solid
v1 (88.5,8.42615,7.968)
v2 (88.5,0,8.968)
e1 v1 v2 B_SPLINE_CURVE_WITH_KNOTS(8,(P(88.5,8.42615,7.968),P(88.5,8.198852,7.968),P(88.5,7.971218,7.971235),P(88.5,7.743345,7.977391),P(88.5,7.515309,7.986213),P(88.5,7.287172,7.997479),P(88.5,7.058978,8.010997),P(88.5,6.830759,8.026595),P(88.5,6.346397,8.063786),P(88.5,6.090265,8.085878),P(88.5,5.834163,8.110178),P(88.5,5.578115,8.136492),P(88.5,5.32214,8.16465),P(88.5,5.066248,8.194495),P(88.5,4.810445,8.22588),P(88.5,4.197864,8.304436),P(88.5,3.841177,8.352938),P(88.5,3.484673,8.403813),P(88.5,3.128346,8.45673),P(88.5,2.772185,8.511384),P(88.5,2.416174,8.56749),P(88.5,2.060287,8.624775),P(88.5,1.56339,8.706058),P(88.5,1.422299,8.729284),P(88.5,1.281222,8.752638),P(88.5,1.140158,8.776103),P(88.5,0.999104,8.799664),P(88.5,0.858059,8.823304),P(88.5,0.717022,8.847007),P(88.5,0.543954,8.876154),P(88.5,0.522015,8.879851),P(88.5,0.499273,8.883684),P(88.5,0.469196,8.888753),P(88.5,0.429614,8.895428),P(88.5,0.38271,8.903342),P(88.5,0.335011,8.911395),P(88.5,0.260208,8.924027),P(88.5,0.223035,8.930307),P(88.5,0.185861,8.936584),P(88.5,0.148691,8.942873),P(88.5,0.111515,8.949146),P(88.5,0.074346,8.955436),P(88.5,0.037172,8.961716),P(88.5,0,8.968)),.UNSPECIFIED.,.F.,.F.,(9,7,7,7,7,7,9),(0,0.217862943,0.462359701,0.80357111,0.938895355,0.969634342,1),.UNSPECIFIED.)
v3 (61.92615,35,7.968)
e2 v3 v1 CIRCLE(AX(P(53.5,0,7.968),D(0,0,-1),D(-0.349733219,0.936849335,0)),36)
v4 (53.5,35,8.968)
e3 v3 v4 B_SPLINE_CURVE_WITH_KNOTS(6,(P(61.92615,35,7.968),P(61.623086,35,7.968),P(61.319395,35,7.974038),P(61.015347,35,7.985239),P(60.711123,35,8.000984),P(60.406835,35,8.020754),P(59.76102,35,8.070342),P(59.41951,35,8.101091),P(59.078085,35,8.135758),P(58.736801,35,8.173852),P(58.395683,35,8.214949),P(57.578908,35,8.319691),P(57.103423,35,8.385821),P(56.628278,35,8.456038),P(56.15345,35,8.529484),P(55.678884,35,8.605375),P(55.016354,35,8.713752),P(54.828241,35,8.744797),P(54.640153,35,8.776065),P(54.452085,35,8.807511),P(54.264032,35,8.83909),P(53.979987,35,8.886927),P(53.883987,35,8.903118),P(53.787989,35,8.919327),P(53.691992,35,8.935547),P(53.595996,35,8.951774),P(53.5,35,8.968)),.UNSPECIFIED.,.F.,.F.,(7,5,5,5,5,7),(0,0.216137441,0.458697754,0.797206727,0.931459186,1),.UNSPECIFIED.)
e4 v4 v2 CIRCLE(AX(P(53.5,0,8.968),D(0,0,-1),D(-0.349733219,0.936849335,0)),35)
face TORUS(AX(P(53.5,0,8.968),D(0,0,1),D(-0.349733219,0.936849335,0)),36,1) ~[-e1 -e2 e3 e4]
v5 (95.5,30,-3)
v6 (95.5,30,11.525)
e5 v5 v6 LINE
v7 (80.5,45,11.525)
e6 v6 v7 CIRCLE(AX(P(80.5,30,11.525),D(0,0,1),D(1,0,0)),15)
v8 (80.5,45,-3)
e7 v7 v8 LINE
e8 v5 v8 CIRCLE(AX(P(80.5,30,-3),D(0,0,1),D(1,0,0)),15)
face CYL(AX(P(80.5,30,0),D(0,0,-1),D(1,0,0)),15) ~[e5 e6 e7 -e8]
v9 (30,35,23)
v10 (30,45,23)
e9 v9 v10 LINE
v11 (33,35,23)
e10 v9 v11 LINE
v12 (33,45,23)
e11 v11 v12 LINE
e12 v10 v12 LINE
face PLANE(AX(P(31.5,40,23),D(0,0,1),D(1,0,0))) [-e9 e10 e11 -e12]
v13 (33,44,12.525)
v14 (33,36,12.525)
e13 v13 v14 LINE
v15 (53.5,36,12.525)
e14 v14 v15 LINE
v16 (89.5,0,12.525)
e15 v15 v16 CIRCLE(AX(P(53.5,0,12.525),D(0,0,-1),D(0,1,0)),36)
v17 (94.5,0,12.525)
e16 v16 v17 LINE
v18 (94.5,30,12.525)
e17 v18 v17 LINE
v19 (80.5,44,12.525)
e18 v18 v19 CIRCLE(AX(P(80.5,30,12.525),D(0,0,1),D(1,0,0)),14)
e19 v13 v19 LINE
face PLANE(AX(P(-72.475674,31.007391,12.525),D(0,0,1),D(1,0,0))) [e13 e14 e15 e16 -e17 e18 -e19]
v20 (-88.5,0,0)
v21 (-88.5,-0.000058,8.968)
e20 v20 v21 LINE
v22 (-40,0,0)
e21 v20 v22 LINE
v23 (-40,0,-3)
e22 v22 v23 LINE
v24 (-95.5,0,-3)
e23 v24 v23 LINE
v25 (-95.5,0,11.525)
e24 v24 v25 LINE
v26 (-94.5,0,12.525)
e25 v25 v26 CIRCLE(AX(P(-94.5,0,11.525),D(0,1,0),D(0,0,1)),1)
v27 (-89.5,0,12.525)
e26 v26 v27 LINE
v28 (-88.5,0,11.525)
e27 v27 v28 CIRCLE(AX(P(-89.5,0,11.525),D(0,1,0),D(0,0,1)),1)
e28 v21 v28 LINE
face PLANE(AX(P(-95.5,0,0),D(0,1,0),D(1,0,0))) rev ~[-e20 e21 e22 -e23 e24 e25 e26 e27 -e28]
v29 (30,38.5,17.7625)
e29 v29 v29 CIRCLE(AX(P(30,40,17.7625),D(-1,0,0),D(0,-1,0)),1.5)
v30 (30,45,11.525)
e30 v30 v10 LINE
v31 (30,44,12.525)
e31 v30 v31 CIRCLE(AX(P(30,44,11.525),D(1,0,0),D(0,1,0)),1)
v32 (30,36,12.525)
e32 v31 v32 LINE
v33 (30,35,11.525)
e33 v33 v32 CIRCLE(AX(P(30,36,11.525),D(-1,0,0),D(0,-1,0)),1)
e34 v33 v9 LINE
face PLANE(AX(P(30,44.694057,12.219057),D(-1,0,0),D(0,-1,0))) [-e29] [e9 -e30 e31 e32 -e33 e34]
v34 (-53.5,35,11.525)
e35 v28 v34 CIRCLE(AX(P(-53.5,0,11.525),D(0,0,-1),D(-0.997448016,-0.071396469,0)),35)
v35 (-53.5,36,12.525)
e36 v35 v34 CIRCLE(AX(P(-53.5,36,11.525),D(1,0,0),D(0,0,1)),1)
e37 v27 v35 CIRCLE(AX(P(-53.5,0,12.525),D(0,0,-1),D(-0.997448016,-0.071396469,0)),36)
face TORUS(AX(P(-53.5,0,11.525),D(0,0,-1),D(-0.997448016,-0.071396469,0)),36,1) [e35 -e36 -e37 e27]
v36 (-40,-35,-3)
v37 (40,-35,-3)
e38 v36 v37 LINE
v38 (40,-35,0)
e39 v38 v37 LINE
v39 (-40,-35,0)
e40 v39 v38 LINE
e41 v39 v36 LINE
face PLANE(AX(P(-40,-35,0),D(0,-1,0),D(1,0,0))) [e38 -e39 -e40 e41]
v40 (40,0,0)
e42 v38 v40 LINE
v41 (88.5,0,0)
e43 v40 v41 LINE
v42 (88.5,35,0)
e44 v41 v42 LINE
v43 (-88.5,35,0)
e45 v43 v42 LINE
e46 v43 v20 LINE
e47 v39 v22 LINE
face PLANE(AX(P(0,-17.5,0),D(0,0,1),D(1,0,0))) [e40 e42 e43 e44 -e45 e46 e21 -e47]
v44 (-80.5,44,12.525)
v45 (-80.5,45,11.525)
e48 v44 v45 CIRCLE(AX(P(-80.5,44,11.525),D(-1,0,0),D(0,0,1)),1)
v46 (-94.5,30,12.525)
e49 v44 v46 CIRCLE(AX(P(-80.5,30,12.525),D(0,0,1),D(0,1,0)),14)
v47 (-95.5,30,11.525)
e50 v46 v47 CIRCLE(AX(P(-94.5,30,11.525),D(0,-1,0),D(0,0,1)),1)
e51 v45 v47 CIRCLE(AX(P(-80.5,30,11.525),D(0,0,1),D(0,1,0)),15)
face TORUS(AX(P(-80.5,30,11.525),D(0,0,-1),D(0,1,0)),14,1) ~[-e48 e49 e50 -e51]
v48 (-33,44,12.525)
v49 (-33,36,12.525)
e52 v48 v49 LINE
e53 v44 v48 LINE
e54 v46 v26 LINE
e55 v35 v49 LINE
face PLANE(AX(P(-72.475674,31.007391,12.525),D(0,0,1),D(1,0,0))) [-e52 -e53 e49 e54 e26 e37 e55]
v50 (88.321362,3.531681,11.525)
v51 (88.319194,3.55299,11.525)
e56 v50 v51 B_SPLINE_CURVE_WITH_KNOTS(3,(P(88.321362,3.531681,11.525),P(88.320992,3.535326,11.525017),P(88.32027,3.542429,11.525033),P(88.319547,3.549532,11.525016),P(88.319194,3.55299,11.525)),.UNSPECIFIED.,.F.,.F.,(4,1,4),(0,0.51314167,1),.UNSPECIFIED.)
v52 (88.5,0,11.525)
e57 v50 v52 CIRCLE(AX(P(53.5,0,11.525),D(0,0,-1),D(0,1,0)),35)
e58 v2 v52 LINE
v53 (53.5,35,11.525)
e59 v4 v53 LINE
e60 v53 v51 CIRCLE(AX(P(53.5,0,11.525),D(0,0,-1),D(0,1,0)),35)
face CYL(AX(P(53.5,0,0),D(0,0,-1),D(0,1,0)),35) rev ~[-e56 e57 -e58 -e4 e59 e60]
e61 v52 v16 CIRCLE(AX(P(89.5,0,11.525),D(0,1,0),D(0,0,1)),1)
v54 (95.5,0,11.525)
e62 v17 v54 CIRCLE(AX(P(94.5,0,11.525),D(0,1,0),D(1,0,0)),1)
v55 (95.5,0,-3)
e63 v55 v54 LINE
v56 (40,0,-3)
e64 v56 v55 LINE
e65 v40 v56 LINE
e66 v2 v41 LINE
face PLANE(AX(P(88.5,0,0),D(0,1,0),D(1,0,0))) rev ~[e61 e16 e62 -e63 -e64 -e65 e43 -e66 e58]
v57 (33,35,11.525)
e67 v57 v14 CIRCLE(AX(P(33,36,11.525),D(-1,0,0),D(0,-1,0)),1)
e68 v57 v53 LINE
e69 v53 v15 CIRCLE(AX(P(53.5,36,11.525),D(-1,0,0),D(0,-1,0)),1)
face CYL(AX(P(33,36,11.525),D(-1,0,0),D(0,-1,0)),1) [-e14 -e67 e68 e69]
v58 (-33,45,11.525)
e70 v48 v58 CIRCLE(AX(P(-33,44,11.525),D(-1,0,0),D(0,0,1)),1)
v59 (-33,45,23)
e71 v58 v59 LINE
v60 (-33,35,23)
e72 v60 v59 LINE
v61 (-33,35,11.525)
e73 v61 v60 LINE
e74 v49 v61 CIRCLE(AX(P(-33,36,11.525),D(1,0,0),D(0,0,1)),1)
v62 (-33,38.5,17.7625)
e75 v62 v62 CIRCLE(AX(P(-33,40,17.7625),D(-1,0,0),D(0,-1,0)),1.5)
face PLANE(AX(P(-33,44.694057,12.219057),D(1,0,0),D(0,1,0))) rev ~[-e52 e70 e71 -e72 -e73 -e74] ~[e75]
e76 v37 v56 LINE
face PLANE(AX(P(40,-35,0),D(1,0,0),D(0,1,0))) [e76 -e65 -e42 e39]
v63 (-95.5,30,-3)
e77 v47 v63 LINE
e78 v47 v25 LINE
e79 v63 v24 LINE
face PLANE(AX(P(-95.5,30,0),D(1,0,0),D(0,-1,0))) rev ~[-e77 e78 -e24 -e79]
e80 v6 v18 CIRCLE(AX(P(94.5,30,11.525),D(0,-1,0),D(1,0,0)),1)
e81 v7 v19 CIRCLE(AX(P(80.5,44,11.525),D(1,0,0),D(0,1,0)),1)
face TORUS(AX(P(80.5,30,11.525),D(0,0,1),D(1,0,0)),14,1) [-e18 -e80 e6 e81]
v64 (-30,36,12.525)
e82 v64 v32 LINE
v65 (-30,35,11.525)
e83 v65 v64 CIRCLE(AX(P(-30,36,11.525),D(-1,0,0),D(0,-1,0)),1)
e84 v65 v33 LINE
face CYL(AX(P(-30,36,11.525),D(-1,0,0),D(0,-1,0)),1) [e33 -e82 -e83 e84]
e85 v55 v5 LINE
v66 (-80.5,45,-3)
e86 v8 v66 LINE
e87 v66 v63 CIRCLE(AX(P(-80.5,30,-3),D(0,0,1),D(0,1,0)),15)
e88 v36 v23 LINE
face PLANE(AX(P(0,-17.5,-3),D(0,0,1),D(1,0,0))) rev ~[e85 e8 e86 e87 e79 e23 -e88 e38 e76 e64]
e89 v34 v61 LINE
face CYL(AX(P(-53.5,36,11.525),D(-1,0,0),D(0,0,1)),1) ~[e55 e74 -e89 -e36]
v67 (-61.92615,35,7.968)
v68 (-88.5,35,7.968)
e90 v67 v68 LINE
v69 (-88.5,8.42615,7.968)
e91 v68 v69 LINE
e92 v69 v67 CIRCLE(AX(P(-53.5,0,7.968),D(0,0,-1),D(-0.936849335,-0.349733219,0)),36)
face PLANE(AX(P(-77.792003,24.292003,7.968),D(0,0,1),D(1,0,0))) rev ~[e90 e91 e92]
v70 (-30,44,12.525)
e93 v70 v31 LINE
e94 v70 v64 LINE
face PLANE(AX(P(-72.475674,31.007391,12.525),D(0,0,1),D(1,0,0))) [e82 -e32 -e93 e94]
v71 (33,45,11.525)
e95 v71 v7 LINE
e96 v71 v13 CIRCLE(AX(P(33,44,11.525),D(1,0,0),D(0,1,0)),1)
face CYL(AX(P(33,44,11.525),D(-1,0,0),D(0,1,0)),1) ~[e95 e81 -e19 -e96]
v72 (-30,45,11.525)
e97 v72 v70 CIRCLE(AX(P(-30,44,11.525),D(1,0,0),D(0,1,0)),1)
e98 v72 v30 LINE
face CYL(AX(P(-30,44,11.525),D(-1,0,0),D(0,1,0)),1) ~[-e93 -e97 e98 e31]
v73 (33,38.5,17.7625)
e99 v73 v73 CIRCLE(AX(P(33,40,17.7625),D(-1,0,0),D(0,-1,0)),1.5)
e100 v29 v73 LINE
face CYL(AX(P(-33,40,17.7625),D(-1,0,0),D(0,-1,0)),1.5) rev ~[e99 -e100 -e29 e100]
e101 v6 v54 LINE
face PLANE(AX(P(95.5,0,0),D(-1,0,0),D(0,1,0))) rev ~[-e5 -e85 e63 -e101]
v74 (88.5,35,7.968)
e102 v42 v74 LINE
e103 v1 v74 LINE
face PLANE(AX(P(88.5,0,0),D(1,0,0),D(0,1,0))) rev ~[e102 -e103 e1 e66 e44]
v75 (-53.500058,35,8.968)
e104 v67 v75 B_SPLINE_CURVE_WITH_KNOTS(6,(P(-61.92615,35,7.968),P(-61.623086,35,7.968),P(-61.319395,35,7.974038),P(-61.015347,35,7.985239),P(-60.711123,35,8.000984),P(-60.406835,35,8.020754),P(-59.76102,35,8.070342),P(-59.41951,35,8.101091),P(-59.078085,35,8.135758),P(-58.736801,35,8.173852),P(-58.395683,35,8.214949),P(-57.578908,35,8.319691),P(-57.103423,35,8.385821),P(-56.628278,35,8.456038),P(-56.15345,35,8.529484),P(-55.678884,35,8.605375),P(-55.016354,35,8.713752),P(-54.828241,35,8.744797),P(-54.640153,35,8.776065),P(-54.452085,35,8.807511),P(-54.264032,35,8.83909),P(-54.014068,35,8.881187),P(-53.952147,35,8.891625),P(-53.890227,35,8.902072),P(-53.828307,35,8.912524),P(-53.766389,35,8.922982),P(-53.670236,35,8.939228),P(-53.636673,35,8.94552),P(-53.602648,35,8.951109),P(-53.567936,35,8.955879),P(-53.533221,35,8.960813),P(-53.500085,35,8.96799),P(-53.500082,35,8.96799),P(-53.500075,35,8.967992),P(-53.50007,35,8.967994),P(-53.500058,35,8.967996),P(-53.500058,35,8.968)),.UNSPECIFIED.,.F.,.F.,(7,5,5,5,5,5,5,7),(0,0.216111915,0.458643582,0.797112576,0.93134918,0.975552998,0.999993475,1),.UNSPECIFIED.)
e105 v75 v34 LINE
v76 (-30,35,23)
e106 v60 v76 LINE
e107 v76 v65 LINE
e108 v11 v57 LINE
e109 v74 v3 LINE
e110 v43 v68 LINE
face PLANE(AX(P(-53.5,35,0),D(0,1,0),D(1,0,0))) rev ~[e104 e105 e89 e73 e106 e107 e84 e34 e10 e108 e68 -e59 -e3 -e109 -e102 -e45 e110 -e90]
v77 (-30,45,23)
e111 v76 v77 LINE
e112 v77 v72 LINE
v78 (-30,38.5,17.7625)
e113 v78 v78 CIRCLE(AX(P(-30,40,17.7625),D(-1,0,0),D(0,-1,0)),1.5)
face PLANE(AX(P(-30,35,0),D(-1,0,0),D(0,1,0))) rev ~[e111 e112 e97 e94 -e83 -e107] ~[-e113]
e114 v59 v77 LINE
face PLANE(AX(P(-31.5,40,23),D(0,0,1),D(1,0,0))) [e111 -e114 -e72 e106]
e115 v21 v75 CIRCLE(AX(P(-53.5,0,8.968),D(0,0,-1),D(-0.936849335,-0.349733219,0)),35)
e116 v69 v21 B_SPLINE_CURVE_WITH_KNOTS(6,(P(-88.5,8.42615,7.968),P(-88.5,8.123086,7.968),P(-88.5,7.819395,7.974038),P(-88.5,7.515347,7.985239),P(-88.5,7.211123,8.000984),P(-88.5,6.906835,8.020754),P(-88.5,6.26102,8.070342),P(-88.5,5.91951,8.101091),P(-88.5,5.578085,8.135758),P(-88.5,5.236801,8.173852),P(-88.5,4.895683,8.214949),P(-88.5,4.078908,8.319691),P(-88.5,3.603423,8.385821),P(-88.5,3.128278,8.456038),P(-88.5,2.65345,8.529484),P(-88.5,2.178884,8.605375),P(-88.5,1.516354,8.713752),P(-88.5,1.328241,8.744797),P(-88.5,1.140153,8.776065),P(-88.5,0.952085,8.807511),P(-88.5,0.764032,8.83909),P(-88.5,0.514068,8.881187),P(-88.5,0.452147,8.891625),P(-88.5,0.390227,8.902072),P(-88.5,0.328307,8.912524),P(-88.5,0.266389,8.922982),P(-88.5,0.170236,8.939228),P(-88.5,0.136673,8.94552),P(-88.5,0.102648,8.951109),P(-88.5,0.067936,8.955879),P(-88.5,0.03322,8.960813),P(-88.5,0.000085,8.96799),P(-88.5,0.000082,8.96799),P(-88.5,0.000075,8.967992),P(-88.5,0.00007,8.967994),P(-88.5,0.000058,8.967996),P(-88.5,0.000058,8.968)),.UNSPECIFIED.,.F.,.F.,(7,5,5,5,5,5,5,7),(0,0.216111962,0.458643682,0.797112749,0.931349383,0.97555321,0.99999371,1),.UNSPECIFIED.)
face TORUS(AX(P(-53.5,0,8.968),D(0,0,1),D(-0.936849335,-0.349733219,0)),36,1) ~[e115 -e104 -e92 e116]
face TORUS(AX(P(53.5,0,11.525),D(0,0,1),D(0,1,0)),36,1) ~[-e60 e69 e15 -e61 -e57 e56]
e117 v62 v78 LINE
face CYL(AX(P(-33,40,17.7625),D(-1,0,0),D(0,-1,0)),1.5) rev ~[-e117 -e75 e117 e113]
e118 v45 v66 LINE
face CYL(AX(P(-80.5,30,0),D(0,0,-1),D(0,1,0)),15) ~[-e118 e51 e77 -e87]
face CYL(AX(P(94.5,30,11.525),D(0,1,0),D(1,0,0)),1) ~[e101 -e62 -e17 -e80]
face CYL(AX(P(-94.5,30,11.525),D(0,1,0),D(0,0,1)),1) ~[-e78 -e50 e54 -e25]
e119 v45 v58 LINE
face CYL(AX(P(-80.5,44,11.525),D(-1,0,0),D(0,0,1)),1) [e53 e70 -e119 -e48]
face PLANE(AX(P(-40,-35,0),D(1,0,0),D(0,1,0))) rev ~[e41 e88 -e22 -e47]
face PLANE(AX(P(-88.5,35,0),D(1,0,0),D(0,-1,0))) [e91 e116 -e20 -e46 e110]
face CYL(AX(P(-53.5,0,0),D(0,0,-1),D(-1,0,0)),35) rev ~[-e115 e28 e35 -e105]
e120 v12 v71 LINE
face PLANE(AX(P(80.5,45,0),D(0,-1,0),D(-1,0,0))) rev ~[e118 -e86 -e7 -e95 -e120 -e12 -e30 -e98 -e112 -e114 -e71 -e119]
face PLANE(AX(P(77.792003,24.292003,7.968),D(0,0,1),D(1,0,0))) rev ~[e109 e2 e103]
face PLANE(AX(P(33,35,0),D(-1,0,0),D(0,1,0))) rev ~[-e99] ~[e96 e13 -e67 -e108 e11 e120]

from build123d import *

# Parameters (mm, degrees)
F0_W         = 80
F0_H         = 35
F0_W_2       = 60
F0_H_2       = 10
F0_W_3       = 3
F1_DEPTH     = 3
F2_DEPTH     = 12.525
F3_DEPTH     = 7.968
F4_DEPTH     = 23
F5_R         = 1.5
F6_DEPTH     = 128.501
F7_T1_DEPTH  = 60
F7_T3_DEPTH  = 47.5
F7_T5_DEPTH  = 20.5
F7_T7_DEPTH  = 32.5
F7_T9_DEPTH  = 20.5
F7_T11_DEPTH = 47.5
F7_T16_ANGLE = 130.941996925
F7_T22_ANGLE = 130.941996925
F7_T26_ANGLE = 94.0941996925
F7_T28_ANGLE = 94.0941996925
F7_T30_ANGLE = 90
F7_T32_ANGLE = 90


# Not quite as in the source:
# - a fillet or chamfer that OpenCascade refuses, or shapes differently, is made with other operations: its cross-section is extruded or revolved along the edge and cut away or added


with BuildPart() as f1:
    # F0 (on Top) → F1 (new body)
    with BuildSketch(Plane.XY):
        with Locations((0, -17.5)):
            Rectangle(F0_W, F0_H)
        with BuildLine():
            Line((-88.5, 35), (-88.5, 0))
            ThreePointArc((-88.5, 0), (-78.2487373415, 24.7487373415), (-53.5, 35))
            Line((-53.5, 35), (-88.5, 35))
        make_face()
        with BuildLine():
            ThreePointArc((53.5, 35), (78.2487373415, 24.7487373415), (88.5, 0))
            Line((88.5, 0), (88.5, 35))
            Line((88.5, 35), (53.5, 35))
        make_face()
        with BuildLine():
            Line((-95.5, 30), (-95.5, 0))
            Line((-95.5, 0), (-88.5, 0))
            Line((-88.5, 0), (-88.5, 35))
            Line((-88.5, 35), (-53.5, 35))
            Line((-53.5, 35), (-33, 35))
            Line((-33, 35), (-33, 45))
            Line((-33, 45), (-80.5, 45))
            ThreePointArc((-80.5, 45), (-91.1066017178, 40.6066017178), (-95.5, 30))
        make_face()
        with Locations((0, 40)):
            Rectangle(F0_W_2, F0_H_2)
        with BuildLine():
            Line((88.5, 35), (88.5, 0))
            Line((88.5, 0), (95.5, 0))
            Line((95.5, 0), (95.5, 30))
            ThreePointArc((95.5, 30), (91.1066017178, 40.6066017178), (80.5, 45))
            Line((80.5, 45), (33, 45))
            Line((33, 45), (33, 35))
            Line((33, 35), (53.5, 35))
            Line((53.5, 35), (88.5, 35))
        make_face()
        with Locations((-31.5, 40)):
            Rectangle(F0_W_3, F0_H_2)
        with Locations((31.5, 40)):
            Rectangle(F0_W_3, F0_H_2)
        with BuildLine():
            ThreePointArc((-53.5, 35), (-78.2487373415, 24.7487373415), (-88.5, 0))
            Line((-88.5, 0), (-40, 0))
            Line((-40, 0), (40, 0))
            Line((40, 0), (88.5, 0))
            ThreePointArc((88.5, 0), (78.2487373415, 24.7487373415), (53.5, 35))
            Line((53.5, 35), (33, 35))
            Line((33, 35), (30, 35))
            Line((30, 35), (-30, 35))
            Line((-30, 35), (-33, 35))
            Line((-33, 35), (-53.5, 35))
        make_face()
    extrude(amount=-F1_DEPTH)

    # F0 (on Top) → F2 (join)
    with BuildSketch(Plane.XY):
        with BuildLine():
            Line((-95.5, 30), (-95.5, 0))
            Line((-95.5, 0), (-88.5, 0))
            Line((-88.5, 0), (-88.5, 35))
            Line((-88.5, 35), (-53.5, 35))
            Line((-53.5, 35), (-33, 35))
            Line((-33, 35), (-33, 45))
            Line((-33, 45), (-80.5, 45))
            ThreePointArc((-80.5, 45), (-91.1066017178, 40.6066017178), (-95.5, 30))
        make_face()
        with Locations((-31.5, 40)):
            Rectangle(F0_W_3, F0_H_2)
        with Locations((0, 40)):
            Rectangle(F0_W_2, F0_H_2)
        with Locations((31.5, 40)):
            Rectangle(F0_W_3, F0_H_2)
        with BuildLine():
            Line((88.5, 35), (88.5, 0))
            Line((88.5, 0), (95.5, 0))
            Line((95.5, 0), (95.5, 30))
            ThreePointArc((95.5, 30), (91.1066017178, 40.6066017178), (80.5, 45))
            Line((80.5, 45), (33, 45))
            Line((33, 45), (33, 35))
            Line((33, 35), (53.5, 35))
            Line((53.5, 35), (88.5, 35))
        make_face()
        with BuildLine():
            Line((-88.5, 35), (-88.5, 0))
            ThreePointArc((-88.5, 0), (-78.2487373415, 24.7487373415), (-53.5, 35))
            Line((-53.5, 35), (-88.5, 35))
        make_face()
        with BuildLine():
            ThreePointArc((53.5, 35), (78.2487373415, 24.7487373415), (88.5, 0))
            Line((88.5, 0), (88.5, 35))
            Line((88.5, 35), (53.5, 35))
        make_face()
    extrude(amount=F2_DEPTH)

    # F0 (on Top) → F3 (cut)
    with BuildSketch(Plane.XY):
        with BuildLine():
            Line((-88.5, 35), (-88.5, 0))
            ThreePointArc((-88.5, 0), (-78.2487373415, 24.7487373415), (-53.5, 35))
            Line((-53.5, 35), (-88.5, 35))
        make_face()
        with BuildLine():
            ThreePointArc((53.5, 35), (78.2487373415, 24.7487373415), (88.5, 0))
            Line((88.5, 0), (88.5, 35))
            Line((88.5, 35), (53.5, 35))
        make_face()
    extrude(amount=F3_DEPTH, mode=Mode.SUBTRACT)

    # F0 (on Top) → F4 (join)
    with BuildSketch(Plane.XY):
        with Locations((-31.5, 40)):
            Rectangle(F0_W_3, F0_H_2)
        with Locations((31.5, 40)):
            Rectangle(F0_W_3, F0_H_2)
    extrude(amount=F4_DEPTH)

    # F5 (on face) → F6 (cut, through all)
    with BuildSketch(Plane(origin=(-33, 0, 0), x_dir=(0, -1, 0), z_dir=(-1, 0, 0))):
        with Locations((-40, 17.7625)):
            Circle(F5_R)
    extrude(amount=-F6_DEPTH, mode=Mode.SUBTRACT)

    # F7: fillet of radius 1 on 14 edges, made by hand

    # F7_s2 → F7_t1 (cut)
    with BuildSketch(Plane.YZ.offset(-30)):
        with BuildLine():
            ThreePointArc((45, 11.525), (44.7071067812, 12.2321067812), (44, 12.525))
            Line((44, 12.525), (45, 12.525))
            Line((45, 12.525), (45, 11.525))
        make_face()
        with BuildLine():
            ThreePointArc((35, 11.525), (35.2928932188, 12.2321067812), (36, 12.525))
            Line((36, 12.525), (35, 12.525))
            Line((35, 12.525), (35, 11.525))
        make_face()
    extrude(amount=F7_T1_DEPTH, mode=Mode.SUBTRACT)

    # F7_s4 → F7_t3 (cut)
    with BuildSketch(Plane.YZ.offset(-80.5)):
        with BuildLine():
            ThreePointArc((44, 12.525), (44.7071067812, 12.2321067812), (45, 11.525))
            Line((45, 11.525), (45, 12.525))
            Line((45, 12.525), (44, 12.525))
        make_face()
    extrude(amount=F7_T3_DEPTH, mode=Mode.SUBTRACT)

    # F7_s6 → F7_t5 (cut)
    with BuildSketch(Plane.YZ.offset(-53.5)):
        with BuildLine():
            ThreePointArc((36, 12.525), (35.2928932188, 12.2321067812), (35, 11.525))
            Line((35, 11.525), (35, 12.525))
            Line((35, 12.525), (36, 12.525))
        make_face()
    extrude(amount=F7_T5_DEPTH, mode=Mode.SUBTRACT)

    # F7_s8 → F7_t7 (cut)
    with BuildSketch(Plane.XZ.offset(-30)):
        with BuildLine():
            ThreePointArc((-94.5, 12.525), (-95.2071067812, 12.2321067812), (-95.5, 11.525))
            Line((-95.5, 11.525), (-95.5, 12.525))
            Line((-95.5, 12.525), (-94.5, 12.525))
        make_face()
        with BuildLine():
            ThreePointArc((95.5, 11.525), (95.2071067812, 12.2321067812), (94.5, 12.525))
            Line((94.5, 12.525), (95.5, 12.525))
            Line((95.5, 12.525), (95.5, 11.525))
        make_face()
    extrude(amount=F7_T7_DEPTH, mode=Mode.SUBTRACT)

    # F7_s10 → F7_t9 (cut)
    with BuildSketch(Plane.YZ.offset(33)):
        with BuildLine():
            ThreePointArc((35, 11.525), (35.2928932188, 12.2321067812), (36, 12.525))
            Line((36, 12.525), (35, 12.525))
            Line((35, 12.525), (35, 11.525))
        make_face()
    extrude(amount=F7_T9_DEPTH, mode=Mode.SUBTRACT)

    # F7_s12 → F7_t11 (cut)
    with BuildSketch(Plane.YZ.offset(33)):
        with BuildLine():
            ThreePointArc((45, 11.525), (44.7071067812, 12.2321067812), (44, 12.525))
            Line((44, 12.525), (45, 12.525))
            Line((45, 12.525), (45, 11.525))
        make_face()
    extrude(amount=F7_T11_DEPTH, mode=Mode.SUBTRACT)


with BuildPart() as f7_tool14:
    # F7_s15 → F7_t16 (revolve)
    with BuildSketch(Plane(origin=(-6.5437628549, 17.5291323355, 0), x_dir=(0, 0, 1), z_dir=(0.3497332189, -0.9368493345, 0))):
        with BuildLine():
            ThreePointArc((8.968, 85.1214393974), (8.2608932188, 85.4143326162), (7.968, 86.1214393974))
            Line((7.968, 86.1214393974), (7.968, 85.1214393974))
            Line((7.968, 85.1214393974), (8.968, 85.1214393974))
        make_face()
    revolve(axis=Axis((-53.5, 0, 7.968), (0, 0, -1)), revolution_arc=F7_T16_ANGLE)

    split(bisect_by=Plane.YZ.offset(-88.5), keep=Keep.TOP)

    split(bisect_by=Plane.XZ.offset(-35), keep=Keep.TOP)


with BuildPart() as f1_1:
    add(f1.part)

    # F7_t13: cut F7_tool14
    add(f7_tool14.part, mode=Mode.SUBTRACT)


with BuildPart() as f7_tool20:
    # F7_s21 → F7_t22 (revolve)
    with BuildSketch(Plane(origin=(46.9562371451, 17.5291323355, 0), x_dir=(0, 0, 1), z_dir=(-0.9368493345, -0.3497332189, 0))):
        with BuildLine():
            ThreePointArc((8.968, 16.2892727897), (8.2608932188, 16.5821660086), (7.968, 17.2892727897))
            Line((7.968, 17.2892727897), (7.968, 16.2892727897))
            Line((7.968, 16.2892727897), (8.968, 16.2892727897))
        make_face()
    revolve(axis=Axis((53.5, 0, 7.968), (0, 0, -1)), revolution_arc=F7_T22_ANGLE)

    split(bisect_by=Plane.YZ.offset(88.5), keep=Keep.BOTTOM)

    split(bisect_by=Plane.XZ.offset(-35), keep=Keep.TOP)


with BuildPart() as f1_2:
    add(f1_1.part)

    # F7_t19: cut F7_tool20
    add(f7_tool20.part, mode=Mode.SUBTRACT)

    # F7_s25 → F7_t26 (revolve, cut)
    with BuildSketch(Plane(origin=(-0.2727138814, 3.809963227, 0), x_dir=(0, 0, 1), z_dir=(0.0713964686, -0.9974480158, 0))):
        with BuildLine():
            ThreePointArc((11.525, 88.3634688467), (12.2321067812, 88.6563620655), (12.525, 89.3634688467))
            Line((12.525, 89.3634688467), (12.525, 88.3634688467))
            Line((12.525, 88.3634688467), (11.525, 88.3634688467))
        make_face()
    revolve(axis=Axis((-53.5, 0, 12.525), (0, 0, -1)), revolution_arc=F7_T26_ANGLE, mode=Mode.SUBTRACT)

    # F7_s27 → F7_t28 (revolve, cut)
    with BuildSketch(Plane.YZ.offset(53.5)):
        with BuildLine():
            ThreePointArc((36, 12.525), (35.2928932188, 12.2321067812), (35, 11.525))
            Line((35, 11.525), (35, 12.525))
            Line((35, 12.525), (36, 12.525))
        make_face()
    revolve(axis=Axis((53.5, 0, 12.525), (0, 0, -1)), revolution_arc=F7_T28_ANGLE, mode=Mode.SUBTRACT)

    # F7_s29 → F7_t30 (revolve, cut)
    with BuildSketch(Plane.XZ.offset(-30)):
        with BuildLine():
            ThreePointArc((95.5, 11.525), (95.2071067812, 12.2321067812), (94.5, 12.525))
            Line((94.5, 12.525), (95.5, 12.525))
            Line((95.5, 12.525), (95.5, 11.525))
        make_face()
    revolve(axis=Axis((80.5, 30, 12.525), (0, 0, 1)), revolution_arc=F7_T30_ANGLE, mode=Mode.SUBTRACT)

    # F7_s31 → F7_t32 (revolve, cut)
    with BuildSketch(Plane.YZ.offset(-80.5)):
        with BuildLine():
            ThreePointArc((44, 12.525), (44.7071067812, 12.2321067812), (45, 11.525))
            Line((45, 11.525), (45, 12.525))
            Line((45, 12.525), (44, 12.525))
        make_face()
    revolve(axis=Axis((-80.5, 30, 12.525), (0, 0, 1)), revolution_arc=F7_T32_ANGLE, mode=Mode.SUBTRACT)


solid = f1_2.part
